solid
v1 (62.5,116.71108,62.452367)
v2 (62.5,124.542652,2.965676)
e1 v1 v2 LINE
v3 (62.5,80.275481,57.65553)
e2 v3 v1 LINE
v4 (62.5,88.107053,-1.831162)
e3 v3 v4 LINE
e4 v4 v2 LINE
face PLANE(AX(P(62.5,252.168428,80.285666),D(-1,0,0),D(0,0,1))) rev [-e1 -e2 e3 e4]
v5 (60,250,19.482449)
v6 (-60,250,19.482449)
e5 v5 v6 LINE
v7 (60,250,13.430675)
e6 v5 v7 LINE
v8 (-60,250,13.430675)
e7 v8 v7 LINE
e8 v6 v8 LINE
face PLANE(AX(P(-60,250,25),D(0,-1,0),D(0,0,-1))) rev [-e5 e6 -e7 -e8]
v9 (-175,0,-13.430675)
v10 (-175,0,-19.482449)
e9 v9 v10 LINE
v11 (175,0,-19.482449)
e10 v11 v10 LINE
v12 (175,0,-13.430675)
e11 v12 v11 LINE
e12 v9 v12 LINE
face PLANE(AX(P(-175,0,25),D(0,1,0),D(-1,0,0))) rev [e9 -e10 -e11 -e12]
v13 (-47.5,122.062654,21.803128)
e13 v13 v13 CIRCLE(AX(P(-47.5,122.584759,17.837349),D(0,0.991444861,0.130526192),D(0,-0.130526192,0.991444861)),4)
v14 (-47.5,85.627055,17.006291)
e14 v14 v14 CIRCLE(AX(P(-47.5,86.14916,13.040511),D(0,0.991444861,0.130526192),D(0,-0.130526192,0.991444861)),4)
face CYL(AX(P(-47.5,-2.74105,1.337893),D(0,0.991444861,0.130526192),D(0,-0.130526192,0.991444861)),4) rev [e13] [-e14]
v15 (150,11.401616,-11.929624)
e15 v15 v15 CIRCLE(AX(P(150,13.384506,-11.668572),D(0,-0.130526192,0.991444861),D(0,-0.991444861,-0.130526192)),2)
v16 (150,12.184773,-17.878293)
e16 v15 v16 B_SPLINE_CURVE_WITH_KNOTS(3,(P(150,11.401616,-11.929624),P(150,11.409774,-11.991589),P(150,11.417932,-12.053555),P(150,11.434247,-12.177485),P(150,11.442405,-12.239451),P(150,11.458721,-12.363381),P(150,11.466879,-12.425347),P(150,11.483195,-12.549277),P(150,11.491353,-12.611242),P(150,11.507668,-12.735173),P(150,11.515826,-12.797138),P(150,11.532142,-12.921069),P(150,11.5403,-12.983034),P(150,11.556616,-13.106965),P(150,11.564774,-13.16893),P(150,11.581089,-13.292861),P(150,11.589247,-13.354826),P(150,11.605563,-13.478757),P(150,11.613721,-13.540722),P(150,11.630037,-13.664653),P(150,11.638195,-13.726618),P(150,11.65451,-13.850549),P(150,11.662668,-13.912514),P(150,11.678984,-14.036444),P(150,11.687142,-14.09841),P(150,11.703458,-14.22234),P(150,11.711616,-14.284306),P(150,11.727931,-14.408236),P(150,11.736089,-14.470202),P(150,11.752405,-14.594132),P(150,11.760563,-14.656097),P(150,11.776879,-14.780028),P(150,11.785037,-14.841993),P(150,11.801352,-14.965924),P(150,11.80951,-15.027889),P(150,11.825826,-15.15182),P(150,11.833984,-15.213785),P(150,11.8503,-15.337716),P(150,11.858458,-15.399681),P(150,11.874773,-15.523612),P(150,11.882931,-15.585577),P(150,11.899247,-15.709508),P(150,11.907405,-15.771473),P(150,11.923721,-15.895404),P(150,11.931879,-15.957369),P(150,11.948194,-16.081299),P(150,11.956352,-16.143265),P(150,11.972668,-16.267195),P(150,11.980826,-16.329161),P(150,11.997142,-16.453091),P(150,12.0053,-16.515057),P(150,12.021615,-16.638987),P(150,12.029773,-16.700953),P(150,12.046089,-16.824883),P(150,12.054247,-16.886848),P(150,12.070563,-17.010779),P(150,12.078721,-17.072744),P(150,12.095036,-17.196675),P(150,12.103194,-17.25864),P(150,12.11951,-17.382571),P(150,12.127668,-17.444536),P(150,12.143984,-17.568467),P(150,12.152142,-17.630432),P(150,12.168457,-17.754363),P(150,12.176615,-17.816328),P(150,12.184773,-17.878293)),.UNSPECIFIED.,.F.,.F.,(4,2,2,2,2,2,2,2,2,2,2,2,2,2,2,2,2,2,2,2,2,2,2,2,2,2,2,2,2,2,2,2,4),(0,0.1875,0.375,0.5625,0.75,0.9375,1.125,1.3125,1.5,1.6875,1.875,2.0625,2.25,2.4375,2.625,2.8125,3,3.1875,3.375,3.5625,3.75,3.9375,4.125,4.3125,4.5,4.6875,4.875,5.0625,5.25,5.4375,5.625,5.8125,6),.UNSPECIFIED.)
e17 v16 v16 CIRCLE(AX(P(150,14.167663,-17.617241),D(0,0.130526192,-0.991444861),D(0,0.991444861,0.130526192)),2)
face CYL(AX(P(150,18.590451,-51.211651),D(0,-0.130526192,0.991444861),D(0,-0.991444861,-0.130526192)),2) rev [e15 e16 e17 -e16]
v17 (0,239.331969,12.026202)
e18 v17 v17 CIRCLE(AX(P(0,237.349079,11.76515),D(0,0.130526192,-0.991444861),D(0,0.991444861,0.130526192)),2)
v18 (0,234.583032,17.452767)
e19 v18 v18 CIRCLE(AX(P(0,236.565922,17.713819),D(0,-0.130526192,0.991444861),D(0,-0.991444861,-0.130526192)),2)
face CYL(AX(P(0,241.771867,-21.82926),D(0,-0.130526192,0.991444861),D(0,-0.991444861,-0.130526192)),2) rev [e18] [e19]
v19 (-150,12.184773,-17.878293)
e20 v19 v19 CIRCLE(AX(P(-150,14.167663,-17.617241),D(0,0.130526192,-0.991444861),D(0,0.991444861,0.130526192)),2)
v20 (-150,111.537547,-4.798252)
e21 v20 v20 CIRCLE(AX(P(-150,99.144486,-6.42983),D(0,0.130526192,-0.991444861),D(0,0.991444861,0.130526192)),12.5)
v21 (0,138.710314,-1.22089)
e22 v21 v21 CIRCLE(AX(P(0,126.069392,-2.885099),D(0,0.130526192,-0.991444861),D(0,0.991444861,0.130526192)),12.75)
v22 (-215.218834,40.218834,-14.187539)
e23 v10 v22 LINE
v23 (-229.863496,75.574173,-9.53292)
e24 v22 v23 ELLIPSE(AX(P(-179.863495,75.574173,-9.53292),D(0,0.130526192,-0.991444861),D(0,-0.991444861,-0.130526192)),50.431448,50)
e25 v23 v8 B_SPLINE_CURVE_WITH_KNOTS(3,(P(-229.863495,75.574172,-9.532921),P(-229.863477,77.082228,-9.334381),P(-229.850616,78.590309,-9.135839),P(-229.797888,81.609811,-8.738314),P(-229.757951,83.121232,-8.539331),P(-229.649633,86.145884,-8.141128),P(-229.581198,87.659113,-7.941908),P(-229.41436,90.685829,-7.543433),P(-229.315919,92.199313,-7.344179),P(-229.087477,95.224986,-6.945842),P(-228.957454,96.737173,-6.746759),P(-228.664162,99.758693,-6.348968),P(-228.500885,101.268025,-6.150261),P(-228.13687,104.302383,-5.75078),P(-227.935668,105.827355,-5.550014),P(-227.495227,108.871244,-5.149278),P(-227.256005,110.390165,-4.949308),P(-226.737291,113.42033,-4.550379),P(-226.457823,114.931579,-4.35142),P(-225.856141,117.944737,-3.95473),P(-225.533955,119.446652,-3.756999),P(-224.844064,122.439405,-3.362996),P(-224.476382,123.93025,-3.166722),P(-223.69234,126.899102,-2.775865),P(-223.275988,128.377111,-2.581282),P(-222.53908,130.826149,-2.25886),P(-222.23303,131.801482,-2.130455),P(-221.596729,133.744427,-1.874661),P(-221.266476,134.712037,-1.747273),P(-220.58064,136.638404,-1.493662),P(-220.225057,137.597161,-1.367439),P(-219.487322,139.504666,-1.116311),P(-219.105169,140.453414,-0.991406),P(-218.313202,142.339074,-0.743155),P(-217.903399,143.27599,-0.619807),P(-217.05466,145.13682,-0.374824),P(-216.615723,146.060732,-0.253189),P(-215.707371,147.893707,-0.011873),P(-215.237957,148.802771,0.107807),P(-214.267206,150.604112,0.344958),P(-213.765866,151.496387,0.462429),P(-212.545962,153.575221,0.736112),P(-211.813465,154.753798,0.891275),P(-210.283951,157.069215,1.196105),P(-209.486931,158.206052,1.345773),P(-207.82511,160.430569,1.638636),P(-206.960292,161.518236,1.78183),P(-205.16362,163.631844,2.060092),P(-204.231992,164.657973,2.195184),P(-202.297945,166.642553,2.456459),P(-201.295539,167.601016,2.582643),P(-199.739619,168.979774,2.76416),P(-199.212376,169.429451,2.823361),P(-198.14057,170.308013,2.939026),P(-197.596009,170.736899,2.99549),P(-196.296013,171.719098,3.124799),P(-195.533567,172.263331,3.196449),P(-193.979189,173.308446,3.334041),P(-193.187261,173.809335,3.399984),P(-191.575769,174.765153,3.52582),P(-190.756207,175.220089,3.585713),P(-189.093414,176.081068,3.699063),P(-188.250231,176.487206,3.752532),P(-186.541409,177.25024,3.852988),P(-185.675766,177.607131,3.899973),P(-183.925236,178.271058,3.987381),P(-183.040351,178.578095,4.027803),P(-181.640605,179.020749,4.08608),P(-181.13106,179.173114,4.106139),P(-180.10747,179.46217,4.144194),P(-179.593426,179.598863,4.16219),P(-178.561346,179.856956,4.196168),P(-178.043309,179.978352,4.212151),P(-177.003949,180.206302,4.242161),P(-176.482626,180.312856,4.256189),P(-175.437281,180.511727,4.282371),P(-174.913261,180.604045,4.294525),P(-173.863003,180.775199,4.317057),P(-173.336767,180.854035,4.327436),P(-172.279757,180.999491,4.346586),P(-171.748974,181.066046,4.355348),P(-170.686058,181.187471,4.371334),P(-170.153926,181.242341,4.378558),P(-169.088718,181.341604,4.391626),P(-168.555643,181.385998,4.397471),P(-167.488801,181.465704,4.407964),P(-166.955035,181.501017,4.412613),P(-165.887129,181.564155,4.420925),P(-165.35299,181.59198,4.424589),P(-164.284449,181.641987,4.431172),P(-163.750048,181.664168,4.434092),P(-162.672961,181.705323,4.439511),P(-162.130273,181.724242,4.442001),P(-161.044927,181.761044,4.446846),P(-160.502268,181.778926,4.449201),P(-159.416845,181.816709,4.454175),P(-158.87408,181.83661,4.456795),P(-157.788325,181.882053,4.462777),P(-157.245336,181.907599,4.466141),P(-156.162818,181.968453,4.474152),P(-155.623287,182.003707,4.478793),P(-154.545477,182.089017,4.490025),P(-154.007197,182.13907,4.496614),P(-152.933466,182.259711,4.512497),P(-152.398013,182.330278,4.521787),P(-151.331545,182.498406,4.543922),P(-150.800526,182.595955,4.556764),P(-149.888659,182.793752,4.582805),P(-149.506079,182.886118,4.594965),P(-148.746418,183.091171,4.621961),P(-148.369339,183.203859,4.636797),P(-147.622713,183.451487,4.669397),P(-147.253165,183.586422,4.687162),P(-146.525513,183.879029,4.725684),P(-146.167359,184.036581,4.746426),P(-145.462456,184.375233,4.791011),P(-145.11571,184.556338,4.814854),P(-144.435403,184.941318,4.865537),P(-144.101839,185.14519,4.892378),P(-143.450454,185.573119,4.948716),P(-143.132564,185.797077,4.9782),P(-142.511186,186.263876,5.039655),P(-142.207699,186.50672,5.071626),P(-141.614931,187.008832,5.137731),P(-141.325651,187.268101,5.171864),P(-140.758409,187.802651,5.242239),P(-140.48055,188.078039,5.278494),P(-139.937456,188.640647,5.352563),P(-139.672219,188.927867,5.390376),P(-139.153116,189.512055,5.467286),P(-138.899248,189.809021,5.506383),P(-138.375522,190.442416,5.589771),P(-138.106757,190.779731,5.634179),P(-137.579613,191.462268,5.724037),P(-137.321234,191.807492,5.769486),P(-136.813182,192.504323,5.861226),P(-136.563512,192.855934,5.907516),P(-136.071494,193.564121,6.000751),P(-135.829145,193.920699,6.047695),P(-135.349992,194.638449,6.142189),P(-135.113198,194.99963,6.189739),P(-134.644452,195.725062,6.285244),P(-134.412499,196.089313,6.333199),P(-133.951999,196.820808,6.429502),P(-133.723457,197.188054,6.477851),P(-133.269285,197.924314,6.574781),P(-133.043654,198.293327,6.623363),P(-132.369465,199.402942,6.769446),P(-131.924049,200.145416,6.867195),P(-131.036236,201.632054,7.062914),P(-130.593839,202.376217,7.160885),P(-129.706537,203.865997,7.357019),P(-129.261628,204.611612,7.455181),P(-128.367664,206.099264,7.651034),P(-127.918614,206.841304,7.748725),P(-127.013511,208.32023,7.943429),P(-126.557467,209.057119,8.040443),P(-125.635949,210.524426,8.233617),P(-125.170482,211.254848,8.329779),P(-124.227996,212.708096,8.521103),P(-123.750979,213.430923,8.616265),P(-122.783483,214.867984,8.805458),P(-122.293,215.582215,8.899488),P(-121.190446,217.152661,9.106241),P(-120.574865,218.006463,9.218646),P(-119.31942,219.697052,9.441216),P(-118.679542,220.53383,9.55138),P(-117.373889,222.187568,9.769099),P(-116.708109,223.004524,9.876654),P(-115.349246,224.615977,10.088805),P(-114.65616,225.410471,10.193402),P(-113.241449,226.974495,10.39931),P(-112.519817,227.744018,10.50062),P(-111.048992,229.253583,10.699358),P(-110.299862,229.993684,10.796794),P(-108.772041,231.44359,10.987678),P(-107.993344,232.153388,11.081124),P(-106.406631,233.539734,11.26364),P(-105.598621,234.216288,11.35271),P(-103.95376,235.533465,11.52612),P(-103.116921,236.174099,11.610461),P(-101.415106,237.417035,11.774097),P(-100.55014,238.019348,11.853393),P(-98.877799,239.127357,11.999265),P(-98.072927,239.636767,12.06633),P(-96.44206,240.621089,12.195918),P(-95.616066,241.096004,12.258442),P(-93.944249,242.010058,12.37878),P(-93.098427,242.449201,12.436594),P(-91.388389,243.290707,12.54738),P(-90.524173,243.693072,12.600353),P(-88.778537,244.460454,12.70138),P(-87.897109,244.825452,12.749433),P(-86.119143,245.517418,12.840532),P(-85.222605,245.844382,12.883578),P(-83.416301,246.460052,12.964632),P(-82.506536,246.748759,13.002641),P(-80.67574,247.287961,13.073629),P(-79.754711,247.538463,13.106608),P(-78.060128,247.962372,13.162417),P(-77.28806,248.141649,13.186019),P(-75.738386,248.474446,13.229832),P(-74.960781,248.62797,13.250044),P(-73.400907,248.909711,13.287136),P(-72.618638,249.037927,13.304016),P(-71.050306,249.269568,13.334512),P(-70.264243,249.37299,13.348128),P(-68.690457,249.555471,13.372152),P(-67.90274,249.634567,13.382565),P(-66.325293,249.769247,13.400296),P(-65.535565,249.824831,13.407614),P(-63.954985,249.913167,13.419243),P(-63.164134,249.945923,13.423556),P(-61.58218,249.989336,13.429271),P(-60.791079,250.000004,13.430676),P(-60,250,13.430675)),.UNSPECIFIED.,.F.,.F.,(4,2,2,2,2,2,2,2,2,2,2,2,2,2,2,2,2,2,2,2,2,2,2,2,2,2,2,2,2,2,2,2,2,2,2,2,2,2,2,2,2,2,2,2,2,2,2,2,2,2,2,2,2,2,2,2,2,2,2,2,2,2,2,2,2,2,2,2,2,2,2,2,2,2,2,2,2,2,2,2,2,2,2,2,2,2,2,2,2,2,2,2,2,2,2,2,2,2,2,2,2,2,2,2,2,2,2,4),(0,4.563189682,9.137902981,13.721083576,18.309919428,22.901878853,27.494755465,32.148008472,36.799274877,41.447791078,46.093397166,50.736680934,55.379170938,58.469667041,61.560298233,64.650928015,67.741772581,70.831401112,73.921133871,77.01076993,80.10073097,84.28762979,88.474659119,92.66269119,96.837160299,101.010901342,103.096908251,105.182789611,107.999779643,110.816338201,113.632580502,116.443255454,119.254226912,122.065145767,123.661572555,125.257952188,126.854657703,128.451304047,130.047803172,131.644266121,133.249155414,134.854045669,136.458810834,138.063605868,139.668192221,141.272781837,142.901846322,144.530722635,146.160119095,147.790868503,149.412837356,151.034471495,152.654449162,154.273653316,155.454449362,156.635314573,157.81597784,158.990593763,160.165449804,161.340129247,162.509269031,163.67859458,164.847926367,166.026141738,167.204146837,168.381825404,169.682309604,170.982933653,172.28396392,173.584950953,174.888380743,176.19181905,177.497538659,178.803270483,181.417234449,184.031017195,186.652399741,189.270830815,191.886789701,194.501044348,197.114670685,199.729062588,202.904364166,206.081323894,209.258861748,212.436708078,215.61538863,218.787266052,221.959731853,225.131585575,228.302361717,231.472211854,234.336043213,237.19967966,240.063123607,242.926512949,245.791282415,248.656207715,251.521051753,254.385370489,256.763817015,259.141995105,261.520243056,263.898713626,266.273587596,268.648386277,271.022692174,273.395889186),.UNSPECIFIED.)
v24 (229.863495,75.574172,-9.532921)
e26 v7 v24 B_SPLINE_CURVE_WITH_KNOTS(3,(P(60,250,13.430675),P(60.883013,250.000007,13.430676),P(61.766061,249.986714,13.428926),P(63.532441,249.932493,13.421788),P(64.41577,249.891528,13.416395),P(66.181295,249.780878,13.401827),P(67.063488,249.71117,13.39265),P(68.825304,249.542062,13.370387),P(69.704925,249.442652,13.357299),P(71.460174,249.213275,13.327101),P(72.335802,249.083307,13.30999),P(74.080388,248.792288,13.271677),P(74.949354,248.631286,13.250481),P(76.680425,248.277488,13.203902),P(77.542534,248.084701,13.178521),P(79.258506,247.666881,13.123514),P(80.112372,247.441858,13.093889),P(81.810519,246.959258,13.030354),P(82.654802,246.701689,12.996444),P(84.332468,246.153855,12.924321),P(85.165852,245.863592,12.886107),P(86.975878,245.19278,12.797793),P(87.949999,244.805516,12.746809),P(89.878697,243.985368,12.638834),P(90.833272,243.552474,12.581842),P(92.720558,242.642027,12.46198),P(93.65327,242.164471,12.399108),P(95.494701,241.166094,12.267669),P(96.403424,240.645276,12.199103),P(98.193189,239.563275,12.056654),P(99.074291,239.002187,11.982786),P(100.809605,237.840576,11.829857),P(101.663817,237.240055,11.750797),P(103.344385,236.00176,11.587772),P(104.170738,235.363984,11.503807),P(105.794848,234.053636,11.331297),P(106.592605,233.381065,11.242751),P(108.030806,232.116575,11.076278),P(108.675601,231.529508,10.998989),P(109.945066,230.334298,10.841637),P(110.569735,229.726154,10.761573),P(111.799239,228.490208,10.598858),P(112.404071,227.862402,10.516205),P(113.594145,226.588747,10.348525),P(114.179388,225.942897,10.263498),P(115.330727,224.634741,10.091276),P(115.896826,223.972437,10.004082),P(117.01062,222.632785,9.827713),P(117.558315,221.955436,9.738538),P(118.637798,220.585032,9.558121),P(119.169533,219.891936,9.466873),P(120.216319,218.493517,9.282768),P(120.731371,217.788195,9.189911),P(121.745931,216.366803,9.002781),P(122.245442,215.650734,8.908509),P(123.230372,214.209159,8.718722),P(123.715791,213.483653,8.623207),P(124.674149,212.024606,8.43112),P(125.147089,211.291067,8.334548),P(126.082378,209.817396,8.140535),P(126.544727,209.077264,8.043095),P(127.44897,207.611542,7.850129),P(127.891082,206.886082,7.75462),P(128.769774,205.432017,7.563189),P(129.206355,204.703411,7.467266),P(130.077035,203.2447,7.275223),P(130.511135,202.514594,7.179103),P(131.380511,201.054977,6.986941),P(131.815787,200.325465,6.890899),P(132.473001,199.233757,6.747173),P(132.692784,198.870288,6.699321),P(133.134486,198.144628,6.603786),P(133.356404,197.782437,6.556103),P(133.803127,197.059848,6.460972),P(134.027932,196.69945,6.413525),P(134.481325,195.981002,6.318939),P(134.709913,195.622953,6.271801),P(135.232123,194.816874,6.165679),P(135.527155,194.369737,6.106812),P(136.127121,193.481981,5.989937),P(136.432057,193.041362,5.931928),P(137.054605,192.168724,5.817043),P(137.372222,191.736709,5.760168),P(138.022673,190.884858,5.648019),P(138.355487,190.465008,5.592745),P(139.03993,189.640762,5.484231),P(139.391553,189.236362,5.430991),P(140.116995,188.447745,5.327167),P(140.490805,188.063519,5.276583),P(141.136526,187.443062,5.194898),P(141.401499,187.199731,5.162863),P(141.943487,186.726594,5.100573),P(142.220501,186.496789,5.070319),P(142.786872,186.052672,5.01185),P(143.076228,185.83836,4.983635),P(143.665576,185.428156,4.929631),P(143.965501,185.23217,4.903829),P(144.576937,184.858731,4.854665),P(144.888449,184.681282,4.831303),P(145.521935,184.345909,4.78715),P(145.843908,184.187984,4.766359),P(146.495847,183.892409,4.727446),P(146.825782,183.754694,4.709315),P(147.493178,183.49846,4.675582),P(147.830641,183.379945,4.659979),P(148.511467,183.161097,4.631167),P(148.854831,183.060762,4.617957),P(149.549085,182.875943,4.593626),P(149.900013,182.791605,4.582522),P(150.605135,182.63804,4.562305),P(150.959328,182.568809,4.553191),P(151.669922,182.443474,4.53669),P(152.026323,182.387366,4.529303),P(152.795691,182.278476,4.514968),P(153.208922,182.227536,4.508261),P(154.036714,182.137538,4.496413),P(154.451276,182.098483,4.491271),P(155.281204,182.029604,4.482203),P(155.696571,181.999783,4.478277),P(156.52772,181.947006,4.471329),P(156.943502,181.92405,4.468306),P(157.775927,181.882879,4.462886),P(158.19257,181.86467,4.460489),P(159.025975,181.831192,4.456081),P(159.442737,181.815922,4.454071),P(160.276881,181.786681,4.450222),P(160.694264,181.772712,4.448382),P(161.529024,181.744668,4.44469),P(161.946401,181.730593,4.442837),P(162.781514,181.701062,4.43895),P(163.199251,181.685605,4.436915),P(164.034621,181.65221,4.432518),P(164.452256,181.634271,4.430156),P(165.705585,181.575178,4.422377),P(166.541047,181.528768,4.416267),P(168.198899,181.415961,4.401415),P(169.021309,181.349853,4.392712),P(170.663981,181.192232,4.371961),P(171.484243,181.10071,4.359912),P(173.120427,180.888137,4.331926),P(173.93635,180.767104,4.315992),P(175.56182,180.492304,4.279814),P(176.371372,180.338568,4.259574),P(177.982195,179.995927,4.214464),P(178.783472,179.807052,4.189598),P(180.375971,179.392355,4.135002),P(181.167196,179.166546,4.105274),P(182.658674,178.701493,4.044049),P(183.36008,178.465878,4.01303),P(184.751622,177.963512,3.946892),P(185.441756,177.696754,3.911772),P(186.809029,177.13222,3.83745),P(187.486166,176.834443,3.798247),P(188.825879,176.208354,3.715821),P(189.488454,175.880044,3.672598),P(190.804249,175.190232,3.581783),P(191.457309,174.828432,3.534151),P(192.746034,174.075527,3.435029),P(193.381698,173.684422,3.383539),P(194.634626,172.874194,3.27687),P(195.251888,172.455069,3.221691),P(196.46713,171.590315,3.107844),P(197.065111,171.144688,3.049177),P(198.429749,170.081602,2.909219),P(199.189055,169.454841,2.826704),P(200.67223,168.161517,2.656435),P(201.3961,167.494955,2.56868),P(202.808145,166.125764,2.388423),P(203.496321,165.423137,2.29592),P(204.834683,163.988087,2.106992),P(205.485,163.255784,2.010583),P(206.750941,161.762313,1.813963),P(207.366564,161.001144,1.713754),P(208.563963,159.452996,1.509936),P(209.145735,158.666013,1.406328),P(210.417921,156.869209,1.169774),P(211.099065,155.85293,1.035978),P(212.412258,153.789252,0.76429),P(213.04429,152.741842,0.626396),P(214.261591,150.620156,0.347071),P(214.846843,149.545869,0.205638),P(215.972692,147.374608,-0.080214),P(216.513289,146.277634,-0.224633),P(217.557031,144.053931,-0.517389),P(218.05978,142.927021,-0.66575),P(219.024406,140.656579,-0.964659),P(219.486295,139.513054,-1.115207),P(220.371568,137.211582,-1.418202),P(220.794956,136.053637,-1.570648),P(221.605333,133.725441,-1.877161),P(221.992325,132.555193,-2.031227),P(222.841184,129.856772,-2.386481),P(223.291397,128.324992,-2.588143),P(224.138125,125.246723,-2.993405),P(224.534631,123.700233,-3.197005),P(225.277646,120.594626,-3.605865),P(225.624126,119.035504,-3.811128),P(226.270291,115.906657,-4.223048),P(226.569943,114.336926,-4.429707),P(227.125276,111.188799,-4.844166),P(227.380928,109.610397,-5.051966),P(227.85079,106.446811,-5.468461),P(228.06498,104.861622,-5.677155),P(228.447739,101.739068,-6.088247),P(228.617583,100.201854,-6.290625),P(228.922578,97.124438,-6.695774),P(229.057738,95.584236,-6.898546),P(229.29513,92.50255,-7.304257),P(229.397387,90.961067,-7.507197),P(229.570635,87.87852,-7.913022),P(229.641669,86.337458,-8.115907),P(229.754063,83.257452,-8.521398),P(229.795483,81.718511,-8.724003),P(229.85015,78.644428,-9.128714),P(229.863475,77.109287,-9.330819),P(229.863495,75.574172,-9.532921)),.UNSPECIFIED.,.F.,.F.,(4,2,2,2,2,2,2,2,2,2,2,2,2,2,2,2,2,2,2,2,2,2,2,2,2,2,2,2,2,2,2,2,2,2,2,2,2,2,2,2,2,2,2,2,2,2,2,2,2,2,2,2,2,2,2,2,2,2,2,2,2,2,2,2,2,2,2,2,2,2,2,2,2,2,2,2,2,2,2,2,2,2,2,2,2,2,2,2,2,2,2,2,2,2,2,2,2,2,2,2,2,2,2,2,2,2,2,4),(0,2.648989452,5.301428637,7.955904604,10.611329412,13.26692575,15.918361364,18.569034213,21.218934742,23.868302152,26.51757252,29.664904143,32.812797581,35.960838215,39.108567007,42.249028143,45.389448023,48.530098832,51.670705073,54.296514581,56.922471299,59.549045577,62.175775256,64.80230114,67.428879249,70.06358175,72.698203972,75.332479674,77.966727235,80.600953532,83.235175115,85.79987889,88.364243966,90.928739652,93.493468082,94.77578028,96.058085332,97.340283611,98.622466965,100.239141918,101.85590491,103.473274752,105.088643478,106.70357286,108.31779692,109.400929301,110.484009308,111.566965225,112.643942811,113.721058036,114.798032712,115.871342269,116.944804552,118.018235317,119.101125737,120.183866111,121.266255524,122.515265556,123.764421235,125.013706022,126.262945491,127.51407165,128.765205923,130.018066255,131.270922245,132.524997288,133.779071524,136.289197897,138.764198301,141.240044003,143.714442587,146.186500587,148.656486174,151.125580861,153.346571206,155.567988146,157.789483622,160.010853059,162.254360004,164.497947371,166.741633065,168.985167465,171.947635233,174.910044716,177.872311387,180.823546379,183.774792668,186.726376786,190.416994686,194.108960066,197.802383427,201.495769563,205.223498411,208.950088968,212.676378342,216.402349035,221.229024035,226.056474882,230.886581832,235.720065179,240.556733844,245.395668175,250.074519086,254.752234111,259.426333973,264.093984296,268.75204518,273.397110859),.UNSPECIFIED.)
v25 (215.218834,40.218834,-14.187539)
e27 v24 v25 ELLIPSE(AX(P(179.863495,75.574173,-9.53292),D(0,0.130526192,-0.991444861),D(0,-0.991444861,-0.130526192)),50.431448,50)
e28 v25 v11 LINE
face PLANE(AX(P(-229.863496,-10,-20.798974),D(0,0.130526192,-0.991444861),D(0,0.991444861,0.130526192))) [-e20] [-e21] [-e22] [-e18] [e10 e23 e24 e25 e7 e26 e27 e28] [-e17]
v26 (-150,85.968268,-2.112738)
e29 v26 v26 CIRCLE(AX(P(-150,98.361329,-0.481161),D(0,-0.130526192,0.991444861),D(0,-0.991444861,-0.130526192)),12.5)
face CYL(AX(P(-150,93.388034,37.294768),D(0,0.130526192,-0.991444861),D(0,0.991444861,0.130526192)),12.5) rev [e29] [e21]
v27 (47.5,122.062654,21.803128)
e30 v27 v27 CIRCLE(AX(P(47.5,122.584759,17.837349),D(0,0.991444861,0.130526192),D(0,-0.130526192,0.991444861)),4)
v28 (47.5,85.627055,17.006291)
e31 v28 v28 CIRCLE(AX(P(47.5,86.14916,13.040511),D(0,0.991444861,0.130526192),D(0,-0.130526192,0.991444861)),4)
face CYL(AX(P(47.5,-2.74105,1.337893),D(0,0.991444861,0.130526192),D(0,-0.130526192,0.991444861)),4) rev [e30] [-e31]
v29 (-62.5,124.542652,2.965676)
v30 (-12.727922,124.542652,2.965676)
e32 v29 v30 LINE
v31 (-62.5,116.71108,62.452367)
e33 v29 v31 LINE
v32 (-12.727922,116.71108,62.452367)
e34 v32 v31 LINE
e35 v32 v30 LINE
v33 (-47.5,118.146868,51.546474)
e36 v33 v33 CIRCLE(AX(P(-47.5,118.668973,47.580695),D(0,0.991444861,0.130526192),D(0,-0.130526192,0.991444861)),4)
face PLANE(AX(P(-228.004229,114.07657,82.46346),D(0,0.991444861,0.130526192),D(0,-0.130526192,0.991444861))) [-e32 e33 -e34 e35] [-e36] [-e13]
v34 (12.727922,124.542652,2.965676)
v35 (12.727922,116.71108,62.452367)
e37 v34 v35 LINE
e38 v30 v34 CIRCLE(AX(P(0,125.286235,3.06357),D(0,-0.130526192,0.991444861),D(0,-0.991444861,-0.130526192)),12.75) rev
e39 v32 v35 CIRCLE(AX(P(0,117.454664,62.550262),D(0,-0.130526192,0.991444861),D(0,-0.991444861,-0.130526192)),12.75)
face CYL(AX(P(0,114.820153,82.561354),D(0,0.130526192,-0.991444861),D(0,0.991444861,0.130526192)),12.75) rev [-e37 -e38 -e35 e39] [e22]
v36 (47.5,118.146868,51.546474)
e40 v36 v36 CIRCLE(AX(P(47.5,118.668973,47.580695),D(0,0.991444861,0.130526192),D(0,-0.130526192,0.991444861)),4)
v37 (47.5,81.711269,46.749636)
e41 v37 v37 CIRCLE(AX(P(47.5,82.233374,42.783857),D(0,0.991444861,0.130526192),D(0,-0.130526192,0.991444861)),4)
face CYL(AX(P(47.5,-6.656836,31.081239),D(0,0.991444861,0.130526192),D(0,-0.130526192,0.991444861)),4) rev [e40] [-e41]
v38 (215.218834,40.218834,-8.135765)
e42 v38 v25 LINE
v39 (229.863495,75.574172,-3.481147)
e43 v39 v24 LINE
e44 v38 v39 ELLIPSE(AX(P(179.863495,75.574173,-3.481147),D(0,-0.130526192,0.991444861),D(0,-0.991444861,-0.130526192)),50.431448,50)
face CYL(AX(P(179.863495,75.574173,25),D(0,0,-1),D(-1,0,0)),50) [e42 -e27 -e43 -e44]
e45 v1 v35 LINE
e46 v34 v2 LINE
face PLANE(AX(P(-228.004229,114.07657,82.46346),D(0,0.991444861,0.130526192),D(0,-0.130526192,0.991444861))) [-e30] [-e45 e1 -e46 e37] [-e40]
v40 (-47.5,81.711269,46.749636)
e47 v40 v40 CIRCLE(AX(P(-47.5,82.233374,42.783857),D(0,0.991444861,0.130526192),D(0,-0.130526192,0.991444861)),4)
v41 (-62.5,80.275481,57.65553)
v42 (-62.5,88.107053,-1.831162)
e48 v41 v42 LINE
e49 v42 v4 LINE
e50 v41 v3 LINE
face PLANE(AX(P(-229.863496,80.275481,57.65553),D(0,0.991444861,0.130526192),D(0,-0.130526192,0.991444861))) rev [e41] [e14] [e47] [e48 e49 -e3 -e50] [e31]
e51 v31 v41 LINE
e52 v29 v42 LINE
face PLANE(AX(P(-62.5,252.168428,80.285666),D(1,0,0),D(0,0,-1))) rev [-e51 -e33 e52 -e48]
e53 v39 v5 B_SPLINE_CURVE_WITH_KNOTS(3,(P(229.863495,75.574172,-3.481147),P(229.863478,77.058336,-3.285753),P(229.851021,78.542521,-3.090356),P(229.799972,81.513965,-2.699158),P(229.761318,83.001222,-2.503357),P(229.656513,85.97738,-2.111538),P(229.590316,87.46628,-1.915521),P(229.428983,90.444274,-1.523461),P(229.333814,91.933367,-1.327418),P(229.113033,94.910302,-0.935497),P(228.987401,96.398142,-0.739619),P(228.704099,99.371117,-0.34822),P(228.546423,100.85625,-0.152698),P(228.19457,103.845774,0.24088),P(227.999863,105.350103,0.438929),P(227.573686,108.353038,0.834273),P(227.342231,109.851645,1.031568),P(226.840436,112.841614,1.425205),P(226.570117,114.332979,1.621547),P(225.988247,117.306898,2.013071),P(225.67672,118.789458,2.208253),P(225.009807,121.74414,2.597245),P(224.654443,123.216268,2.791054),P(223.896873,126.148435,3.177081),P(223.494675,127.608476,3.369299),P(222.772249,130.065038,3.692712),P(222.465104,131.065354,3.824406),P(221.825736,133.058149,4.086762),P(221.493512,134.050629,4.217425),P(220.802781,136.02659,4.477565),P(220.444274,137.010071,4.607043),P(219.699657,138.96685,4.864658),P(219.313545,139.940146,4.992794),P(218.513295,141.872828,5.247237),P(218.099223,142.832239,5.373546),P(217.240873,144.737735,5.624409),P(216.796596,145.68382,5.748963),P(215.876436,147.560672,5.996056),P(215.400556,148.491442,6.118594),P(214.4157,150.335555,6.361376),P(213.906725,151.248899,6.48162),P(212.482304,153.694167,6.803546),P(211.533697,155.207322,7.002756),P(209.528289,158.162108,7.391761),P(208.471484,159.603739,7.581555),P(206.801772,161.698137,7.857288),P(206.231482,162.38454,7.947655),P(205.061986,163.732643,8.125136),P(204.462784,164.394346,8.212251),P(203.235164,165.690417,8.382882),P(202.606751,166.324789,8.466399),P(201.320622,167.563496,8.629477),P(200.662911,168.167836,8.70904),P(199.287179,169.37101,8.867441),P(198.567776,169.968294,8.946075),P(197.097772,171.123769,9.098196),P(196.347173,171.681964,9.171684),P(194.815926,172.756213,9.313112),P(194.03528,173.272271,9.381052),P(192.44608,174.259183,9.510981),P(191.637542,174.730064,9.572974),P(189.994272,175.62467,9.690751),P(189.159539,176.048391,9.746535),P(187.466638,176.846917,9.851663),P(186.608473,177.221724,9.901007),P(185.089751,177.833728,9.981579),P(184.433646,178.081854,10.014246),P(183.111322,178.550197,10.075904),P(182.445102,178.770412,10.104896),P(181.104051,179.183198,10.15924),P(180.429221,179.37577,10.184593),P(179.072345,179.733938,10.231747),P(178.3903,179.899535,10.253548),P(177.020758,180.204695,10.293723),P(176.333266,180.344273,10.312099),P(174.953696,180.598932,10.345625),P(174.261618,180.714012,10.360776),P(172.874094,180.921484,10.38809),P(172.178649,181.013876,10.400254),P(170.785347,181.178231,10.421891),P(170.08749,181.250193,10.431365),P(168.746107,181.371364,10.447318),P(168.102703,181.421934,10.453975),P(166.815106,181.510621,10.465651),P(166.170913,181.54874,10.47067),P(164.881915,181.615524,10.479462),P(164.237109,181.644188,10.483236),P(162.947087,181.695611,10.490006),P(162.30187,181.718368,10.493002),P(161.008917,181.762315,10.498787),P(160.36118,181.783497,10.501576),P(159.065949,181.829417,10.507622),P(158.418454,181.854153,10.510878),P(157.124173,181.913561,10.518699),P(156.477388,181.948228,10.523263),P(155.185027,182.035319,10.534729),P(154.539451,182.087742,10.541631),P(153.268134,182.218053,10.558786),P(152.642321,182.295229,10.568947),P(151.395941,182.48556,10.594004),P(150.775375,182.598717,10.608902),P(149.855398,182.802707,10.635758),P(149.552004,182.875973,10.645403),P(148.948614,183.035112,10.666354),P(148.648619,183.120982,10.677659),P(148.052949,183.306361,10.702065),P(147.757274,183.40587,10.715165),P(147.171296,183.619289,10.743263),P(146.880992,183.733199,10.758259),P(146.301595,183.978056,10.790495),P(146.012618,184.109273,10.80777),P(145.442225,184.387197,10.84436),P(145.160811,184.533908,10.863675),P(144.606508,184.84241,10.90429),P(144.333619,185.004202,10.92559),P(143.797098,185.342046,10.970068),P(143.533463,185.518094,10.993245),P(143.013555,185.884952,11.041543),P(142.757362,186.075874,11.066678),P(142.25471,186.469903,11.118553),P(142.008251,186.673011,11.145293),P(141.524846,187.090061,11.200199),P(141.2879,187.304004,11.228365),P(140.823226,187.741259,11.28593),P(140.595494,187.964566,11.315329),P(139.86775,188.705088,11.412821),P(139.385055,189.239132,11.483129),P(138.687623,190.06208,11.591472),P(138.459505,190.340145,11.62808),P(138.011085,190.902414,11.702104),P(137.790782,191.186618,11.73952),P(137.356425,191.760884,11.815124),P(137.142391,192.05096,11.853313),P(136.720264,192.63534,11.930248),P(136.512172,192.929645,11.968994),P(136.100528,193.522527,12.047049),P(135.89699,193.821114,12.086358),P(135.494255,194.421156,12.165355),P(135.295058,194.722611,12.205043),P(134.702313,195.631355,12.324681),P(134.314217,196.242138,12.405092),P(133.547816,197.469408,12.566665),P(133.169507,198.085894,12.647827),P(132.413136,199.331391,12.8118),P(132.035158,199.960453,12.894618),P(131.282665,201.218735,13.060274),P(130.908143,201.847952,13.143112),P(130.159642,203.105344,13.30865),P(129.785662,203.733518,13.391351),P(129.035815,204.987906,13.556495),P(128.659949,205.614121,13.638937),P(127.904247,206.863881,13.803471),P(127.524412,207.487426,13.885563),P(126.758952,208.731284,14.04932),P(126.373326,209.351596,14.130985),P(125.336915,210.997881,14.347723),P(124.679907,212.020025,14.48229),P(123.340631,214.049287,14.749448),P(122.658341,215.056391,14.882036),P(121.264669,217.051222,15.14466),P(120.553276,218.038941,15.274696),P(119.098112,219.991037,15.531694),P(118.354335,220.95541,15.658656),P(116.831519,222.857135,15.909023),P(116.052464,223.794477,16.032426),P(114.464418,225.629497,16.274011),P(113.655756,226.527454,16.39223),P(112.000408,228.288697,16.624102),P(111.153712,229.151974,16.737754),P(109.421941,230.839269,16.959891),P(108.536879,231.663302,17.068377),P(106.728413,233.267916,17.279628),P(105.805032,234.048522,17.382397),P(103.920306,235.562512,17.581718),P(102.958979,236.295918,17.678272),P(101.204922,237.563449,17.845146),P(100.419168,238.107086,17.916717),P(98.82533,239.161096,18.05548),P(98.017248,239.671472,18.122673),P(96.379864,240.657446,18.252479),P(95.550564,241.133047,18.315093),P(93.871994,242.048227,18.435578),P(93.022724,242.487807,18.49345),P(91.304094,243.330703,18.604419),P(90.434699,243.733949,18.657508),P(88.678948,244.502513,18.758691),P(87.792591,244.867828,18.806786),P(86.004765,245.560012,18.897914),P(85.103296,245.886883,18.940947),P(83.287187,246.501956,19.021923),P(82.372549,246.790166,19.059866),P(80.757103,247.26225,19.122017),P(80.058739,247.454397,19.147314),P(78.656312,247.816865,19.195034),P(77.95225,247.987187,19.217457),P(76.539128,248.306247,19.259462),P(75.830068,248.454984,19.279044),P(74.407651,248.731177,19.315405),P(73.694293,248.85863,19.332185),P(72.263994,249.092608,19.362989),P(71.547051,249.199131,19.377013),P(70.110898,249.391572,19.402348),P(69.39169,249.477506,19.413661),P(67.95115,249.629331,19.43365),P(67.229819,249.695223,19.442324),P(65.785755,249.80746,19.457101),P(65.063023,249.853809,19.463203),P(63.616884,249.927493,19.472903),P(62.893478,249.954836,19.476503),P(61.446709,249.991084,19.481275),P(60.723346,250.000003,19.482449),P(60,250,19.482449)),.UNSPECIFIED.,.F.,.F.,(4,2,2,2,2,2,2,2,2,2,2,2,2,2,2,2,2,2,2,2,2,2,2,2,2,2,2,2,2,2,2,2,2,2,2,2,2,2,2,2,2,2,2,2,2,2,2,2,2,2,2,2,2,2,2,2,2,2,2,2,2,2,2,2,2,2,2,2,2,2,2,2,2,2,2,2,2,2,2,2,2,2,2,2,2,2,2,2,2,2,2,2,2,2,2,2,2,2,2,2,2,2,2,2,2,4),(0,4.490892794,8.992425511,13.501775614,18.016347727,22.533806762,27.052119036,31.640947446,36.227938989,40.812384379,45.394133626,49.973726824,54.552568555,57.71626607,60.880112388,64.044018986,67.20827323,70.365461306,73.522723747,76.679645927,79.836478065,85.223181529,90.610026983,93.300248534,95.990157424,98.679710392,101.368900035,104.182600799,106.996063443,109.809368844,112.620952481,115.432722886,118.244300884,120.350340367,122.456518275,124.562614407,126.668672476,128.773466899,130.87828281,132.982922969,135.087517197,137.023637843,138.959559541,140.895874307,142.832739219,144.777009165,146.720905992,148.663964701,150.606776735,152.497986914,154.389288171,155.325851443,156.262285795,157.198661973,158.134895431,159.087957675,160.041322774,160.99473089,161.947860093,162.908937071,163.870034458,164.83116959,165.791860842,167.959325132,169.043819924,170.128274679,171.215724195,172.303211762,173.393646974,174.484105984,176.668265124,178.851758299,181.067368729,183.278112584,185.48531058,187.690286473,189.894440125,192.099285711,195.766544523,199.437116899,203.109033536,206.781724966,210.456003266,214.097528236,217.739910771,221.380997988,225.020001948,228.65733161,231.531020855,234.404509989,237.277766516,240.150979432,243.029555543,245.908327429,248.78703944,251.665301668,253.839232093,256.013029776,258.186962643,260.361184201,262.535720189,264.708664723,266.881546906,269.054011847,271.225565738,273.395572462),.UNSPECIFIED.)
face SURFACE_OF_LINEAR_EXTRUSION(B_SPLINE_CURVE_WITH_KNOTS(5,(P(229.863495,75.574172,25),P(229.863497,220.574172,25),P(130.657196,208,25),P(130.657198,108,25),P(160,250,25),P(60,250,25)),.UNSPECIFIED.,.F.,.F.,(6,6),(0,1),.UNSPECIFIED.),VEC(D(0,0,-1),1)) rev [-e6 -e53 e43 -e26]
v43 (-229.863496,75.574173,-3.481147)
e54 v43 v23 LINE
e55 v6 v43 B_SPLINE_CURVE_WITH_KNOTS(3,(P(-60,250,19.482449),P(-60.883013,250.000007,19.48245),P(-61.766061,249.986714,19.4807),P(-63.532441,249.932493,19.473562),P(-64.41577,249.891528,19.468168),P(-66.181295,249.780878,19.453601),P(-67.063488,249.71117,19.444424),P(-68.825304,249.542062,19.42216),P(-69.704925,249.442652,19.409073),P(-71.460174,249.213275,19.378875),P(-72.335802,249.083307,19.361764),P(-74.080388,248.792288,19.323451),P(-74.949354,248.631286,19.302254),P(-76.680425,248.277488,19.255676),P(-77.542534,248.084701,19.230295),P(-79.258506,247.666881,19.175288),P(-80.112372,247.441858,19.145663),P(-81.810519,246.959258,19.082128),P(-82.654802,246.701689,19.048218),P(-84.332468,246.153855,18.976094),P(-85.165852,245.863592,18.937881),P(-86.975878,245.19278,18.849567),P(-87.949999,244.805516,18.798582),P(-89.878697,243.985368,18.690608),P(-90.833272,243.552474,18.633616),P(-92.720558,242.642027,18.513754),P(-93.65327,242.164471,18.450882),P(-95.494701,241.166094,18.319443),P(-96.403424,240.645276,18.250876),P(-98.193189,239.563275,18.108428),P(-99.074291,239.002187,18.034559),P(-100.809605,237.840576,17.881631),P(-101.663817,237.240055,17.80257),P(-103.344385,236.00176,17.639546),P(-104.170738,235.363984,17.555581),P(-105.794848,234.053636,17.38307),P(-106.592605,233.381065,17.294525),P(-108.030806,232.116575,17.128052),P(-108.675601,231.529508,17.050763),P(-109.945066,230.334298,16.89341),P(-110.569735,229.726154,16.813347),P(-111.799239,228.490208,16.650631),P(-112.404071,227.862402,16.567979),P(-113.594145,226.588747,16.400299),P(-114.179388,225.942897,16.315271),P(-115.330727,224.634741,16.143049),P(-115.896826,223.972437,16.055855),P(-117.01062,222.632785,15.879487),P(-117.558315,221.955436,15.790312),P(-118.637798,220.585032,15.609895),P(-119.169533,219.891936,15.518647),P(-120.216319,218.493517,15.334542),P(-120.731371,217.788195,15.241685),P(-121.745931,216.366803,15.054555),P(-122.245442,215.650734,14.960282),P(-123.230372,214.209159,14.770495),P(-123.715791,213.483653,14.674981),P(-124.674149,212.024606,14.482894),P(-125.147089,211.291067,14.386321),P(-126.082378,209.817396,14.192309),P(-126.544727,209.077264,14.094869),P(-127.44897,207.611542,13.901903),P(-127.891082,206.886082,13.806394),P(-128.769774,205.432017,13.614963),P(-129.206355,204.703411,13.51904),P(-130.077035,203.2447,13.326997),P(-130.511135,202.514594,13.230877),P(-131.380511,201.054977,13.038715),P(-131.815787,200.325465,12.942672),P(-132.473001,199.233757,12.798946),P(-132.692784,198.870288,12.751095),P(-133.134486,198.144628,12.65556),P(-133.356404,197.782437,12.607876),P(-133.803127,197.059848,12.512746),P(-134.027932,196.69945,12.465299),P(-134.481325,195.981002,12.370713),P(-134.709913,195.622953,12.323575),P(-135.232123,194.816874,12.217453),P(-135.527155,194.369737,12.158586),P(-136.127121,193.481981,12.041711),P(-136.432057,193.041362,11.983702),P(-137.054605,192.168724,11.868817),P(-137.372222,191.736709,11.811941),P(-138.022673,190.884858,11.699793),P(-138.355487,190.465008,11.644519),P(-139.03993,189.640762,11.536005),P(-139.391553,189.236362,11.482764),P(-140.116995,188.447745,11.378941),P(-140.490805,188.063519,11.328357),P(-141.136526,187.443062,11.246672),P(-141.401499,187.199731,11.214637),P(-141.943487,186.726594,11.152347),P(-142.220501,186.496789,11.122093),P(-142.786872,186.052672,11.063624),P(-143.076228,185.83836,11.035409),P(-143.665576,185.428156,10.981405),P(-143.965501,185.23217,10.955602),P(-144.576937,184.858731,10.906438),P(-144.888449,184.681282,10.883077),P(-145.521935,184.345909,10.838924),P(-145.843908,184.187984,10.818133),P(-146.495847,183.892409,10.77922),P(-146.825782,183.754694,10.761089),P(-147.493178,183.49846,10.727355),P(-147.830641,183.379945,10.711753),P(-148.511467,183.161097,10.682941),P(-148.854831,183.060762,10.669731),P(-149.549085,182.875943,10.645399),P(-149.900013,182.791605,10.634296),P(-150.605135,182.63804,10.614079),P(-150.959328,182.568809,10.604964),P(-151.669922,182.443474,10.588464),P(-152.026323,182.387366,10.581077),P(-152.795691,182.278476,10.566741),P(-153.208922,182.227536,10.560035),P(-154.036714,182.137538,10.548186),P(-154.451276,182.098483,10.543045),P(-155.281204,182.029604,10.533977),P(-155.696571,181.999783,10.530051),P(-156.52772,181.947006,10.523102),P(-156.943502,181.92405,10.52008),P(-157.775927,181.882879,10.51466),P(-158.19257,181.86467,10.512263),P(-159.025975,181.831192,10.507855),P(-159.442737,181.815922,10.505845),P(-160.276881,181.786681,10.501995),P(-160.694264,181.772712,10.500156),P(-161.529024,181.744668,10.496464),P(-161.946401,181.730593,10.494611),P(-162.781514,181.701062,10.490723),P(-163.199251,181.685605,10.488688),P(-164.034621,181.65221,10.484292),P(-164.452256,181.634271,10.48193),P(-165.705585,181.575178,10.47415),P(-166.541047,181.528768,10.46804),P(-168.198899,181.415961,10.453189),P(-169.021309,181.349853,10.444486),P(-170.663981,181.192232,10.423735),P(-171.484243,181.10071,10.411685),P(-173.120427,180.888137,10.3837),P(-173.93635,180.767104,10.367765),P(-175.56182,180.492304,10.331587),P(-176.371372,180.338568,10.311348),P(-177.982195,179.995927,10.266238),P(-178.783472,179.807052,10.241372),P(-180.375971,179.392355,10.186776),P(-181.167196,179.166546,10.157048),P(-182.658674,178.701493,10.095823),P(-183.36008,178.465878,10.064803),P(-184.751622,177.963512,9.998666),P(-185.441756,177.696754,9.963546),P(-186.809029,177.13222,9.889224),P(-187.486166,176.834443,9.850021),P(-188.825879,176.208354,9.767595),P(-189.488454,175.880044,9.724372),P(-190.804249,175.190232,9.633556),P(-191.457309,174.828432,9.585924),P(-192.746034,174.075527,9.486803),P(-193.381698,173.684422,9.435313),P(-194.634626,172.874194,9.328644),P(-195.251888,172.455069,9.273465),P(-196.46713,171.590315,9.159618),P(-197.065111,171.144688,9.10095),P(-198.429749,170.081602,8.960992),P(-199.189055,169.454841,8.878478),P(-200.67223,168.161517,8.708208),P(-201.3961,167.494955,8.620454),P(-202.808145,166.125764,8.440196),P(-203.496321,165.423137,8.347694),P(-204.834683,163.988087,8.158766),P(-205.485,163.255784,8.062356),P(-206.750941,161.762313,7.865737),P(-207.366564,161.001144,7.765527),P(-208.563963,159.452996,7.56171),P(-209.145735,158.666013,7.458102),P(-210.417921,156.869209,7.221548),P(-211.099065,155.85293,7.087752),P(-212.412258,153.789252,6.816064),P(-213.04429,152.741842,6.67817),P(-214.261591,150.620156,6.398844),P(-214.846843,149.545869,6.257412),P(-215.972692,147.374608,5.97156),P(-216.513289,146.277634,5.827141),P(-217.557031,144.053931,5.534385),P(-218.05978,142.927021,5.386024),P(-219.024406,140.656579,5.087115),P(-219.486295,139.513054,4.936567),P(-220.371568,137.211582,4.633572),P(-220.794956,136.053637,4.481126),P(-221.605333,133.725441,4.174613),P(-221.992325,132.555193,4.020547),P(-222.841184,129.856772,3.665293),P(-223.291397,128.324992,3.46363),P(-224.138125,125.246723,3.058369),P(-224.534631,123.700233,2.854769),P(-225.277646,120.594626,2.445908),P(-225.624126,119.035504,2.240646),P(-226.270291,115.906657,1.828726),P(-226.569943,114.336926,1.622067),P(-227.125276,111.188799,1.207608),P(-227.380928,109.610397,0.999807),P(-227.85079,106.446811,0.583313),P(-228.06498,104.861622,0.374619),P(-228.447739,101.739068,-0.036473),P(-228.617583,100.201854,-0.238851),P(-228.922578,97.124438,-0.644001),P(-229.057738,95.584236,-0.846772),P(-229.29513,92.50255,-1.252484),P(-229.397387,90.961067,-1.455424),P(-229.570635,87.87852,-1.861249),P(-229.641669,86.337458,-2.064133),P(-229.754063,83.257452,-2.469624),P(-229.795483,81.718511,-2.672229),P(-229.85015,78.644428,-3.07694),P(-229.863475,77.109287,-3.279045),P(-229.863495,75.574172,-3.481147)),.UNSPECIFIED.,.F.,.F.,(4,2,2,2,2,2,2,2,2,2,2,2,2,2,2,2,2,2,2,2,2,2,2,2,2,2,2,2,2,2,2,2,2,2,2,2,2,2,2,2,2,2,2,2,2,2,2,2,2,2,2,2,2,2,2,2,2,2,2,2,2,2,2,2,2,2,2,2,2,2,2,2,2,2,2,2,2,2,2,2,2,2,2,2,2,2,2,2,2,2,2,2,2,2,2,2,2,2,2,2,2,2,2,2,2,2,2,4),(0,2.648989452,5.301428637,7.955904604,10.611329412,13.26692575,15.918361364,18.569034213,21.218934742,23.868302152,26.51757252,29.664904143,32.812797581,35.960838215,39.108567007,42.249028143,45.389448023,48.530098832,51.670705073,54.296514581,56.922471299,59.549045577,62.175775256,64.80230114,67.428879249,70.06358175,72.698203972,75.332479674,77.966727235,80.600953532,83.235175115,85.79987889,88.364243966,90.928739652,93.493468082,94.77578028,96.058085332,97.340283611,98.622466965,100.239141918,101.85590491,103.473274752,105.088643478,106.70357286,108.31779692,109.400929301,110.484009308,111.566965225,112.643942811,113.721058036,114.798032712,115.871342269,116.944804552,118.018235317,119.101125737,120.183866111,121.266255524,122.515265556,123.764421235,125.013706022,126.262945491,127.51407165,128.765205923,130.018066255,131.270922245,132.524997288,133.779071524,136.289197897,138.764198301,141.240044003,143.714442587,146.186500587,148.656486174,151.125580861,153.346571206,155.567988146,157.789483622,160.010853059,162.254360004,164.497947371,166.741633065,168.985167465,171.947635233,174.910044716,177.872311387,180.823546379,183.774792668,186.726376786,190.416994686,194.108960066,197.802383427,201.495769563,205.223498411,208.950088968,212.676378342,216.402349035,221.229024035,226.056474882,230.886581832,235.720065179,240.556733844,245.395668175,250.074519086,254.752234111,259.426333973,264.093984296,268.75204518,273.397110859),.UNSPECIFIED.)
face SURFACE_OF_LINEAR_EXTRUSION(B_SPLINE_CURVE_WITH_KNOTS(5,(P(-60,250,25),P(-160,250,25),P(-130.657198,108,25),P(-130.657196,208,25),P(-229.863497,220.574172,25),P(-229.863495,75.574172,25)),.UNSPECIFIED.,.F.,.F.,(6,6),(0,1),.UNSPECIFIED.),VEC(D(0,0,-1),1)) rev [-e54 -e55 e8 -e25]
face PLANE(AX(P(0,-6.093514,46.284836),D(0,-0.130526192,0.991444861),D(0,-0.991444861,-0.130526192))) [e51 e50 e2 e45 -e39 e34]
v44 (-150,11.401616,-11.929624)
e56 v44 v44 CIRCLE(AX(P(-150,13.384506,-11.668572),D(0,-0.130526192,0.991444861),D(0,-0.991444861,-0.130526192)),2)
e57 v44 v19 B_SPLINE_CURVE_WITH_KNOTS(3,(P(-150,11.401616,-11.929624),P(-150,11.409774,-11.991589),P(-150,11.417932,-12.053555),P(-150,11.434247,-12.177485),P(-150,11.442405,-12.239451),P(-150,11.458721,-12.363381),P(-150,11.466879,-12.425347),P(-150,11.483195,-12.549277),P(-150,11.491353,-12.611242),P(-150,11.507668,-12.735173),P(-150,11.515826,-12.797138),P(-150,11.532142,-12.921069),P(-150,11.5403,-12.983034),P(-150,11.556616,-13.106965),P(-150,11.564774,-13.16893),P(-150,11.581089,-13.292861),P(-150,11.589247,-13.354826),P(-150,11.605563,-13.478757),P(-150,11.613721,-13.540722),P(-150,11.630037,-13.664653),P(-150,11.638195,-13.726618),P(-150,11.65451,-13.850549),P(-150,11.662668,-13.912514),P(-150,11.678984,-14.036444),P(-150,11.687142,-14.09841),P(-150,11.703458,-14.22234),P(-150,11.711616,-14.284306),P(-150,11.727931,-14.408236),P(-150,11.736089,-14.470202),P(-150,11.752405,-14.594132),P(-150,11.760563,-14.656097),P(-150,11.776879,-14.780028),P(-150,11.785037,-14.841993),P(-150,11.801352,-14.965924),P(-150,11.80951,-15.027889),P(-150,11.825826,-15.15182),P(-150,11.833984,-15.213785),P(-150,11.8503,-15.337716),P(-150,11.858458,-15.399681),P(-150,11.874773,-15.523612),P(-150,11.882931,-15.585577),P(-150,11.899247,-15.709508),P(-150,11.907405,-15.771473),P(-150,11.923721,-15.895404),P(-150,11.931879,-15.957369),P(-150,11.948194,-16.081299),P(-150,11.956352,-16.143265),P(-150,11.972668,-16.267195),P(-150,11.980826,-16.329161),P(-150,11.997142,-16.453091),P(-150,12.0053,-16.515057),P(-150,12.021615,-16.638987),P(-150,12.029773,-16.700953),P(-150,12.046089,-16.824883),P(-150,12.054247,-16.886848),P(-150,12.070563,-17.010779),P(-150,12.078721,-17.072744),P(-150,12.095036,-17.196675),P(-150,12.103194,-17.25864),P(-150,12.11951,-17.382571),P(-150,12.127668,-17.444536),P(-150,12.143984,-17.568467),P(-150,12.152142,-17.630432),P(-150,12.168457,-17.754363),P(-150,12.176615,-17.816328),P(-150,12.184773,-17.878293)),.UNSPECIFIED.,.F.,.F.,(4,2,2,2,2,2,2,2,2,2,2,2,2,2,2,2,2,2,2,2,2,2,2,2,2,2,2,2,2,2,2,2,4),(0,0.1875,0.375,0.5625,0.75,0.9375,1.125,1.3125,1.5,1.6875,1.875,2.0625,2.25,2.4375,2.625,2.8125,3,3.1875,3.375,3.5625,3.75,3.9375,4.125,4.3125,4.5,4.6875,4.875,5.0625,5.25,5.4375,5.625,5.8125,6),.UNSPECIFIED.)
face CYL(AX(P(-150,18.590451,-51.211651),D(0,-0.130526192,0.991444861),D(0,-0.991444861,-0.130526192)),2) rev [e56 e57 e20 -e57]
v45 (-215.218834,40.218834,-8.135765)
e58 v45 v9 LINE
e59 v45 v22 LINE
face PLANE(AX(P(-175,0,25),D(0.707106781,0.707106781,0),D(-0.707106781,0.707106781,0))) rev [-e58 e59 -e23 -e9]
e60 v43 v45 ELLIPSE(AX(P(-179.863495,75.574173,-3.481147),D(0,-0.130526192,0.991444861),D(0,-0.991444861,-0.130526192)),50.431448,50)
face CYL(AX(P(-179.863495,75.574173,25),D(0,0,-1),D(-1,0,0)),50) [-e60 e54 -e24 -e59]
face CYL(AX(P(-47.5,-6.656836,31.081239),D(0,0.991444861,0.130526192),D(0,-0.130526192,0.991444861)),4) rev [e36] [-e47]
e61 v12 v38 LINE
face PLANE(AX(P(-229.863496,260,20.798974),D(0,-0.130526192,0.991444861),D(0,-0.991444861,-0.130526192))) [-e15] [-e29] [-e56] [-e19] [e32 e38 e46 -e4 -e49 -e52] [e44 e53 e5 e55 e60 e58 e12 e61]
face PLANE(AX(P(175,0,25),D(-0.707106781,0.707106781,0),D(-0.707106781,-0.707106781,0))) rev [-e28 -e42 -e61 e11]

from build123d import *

# Parameters (mm, degrees)
EXTRUDE_START                                 = -25
EXTRUDE_PLATE_SHAPE_DEPTH                     = 50
CUT_EXTRUDE_ANGLE_DEPTH                       = 341.53226913
CUT_EXTRUDE_ANGLE_DEPTH_BACK                  = 341.53226913
CUT_EXTRUDE_SWITCH_HOLE_DEPTH                 = 340.963942654
CUT_EXTRUDE_SWITCH_HOLE_DEPTH_BACK            = 340.963942654
IGNITION_SWITCH_HOLE_R                        = 12.5
CUT_EXTRUDE_TOP_ENCLOSURE_HOLE_DEPTH          = 340.910991738
CUT_EXTRUDE_TOP_ENCLOSURE_HOLE_DEPTH_BACK     = 340.910991738
SKETCH23_R                                    = 2
CUT_EXTRUDE_BOTTOM_ENCLOSURE_HOLES_DEPTH      = 340.910991738
CUT_EXTRUDE_BOTTOM_ENCLOSURE_HOLES_DEPTH_BACK = 340.910991738
BOTTOM_ENCLOSURE_MOUNTING_HOLES_R             = 2
BOSS_EXTRUDE1_START                           = -6
SKETCH24_W                                    = 125
SKETCH24_H                                    = 75
BOSS_EXTRUDE1_DEPTH                           = 60
CUT_EXTRUDE_SHAFT_HOLE_DEPTH                  = 349.685760497
CUT_EXTRUDE_SHAFT_HOLE_DEPTH_BACK             = 349.685760497
STEERING_WHEEL_SHAFT_HOLE_R                   = 12.75
SKETCH26_W                                    = 456.008458956
SKETCH26_H                                    = 1.5
EXTRUDE_CUT_SLOT_DEPTH                        = 348.814796903
CUT_EXTRUDE17_DEPTH                           = 285.275916409
CUT_EXTRUDE17_DEPTH_BACK                      = 285.275916409
SKETCH28_R                                    = 4
CUT_EXTRUDE18_DEPTH                           = 351.351894744
CUT_EXTRUDE18_DEPTH_BACK                      = 60
SKETCH30_W                                    = 150
SKETCH30_H                                    = 50


# Read off the part's stored shape, not the designer's step: Extrude Plate Shape
with BuildPart() as part:
    # Extrude Plate Shape outline → Extrude Plate Shape (new body)
    with BuildSketch(Plane.XY.offset(EXTRUDE_START)):
        with BuildLine():
            Line((175, 0), (215.218833807, 40.218833807))
            ThreePointArc((215.218833807, 40.218833807), (226.057471223, 56.440000887), (229.863494748, 75.574172084))
            add(Edge.make_bspline(
                [(229.863494748, 75.574172084), (229.863497015, 220.574172084), (130.657195822, 208), (130.657198498, 108), (160, 250), (60, 250)],
                knots=[0, 0, 0, 0, 0, 0, 1, 1, 1, 1, 1, 1], degree=5))
            Line((60, 250), (-60, 250))
            add(Edge.make_bspline(
                [(-60, 250), (-160, 250), (-130.657198498, 108), (-130.657195822, 208), (-229.863497015, 220.574172084), (-229.863494748, 75.574172084)],
                knots=[0, 0, 0, 0, 0, 0, 1, 1, 1, 1, 1, 1], degree=5))
            ThreePointArc((-229.863494748, 75.574172084), (-226.057471223, 56.440000887), (-215.218833807, 40.218833807))
            Line((-215.218833807, 40.218833807), (-175, 0))
            Line((-175, 0), (175, 0))
        make_face()
    extrude(amount=EXTRUDE_PLATE_SHAPE_DEPTH)

    # 5-Degree Front Plate → Cut-Extrude Angle (cut, two sides: drawn at the far end of the back side and taken through both)
    with BuildSketch(Plane(origin=(0, 0, 0), x_dir=(0, 0, -1), z_dir=(1, 0, 0)).offset(-CUT_EXTRUDE_ANGLE_DEPTH_BACK)):
        Polygon((20.798974056, -10), (-14.747200293, 260), (35, 260), (35, -10), align=None)
        Polygon((-20.798974056, 260), (14.747200293, -10), (-35, -10), (-35, 260), align=None)
    extrude(amount=CUT_EXTRUDE_ANGLE_DEPTH + CUT_EXTRUDE_ANGLE_DEPTH_BACK, mode=Mode.SUBTRACT)

    # Ignition Switch Hole → Cut-Extrude Switch Hole (cut, two sides: drawn at the far end of the back side and taken through both)
    with BuildSketch(Plane(origin=(0, 2.521214434, -19.150524903), x_dir=(-1, 0, 0), z_dir=(0, 0.13052619222005532, -0.99144486137381)).offset(-CUT_EXTRUDE_SWITCH_HOLE_DEPTH_BACK)):
        with Locations(Location((150, 97.457030106, 0), (0, 0, 90))):
            Circle(IGNITION_SWITCH_HOLE_R)
    extrude(amount=CUT_EXTRUDE_SWITCH_HOLE_DEPTH + CUT_EXTRUDE_SWITCH_HOLE_DEPTH_BACK, mode=Mode.SUBTRACT)

    # Sketch23 → Cut-Extrude Top Enclosure Hole (cut, two sides: drawn at the far end of the back side and taken through both)
    with BuildSketch(Plane(origin=(0, 1.73805728, -13.201855735), x_dir=(1, 0, 0), z_dir=(0, -0.13052619222005535, 0.99144486137381)).offset(-CUT_EXTRUDE_TOP_ENCLOSURE_HOLE_DEPTH_BACK)):
        with Locations(Location((0, 236.854185237, 0), (0, 0, 270))):
            Circle(SKETCH23_R)
    extrude(amount=CUT_EXTRUDE_TOP_ENCLOSURE_HOLE_DEPTH + CUT_EXTRUDE_TOP_ENCLOSURE_HOLE_DEPTH_BACK, mode=Mode.SUBTRACT)

    # Bottom Enclosure Mounting Holes → Cut-Extrude Bottom Enclosure Holes (cut, two sides: drawn at the far end of the back side and taken through both)
    with BuildSketch(Plane(origin=(0, 1.73805728, -13.201855735), x_dir=(1, 0, 0), z_dir=(0, -0.13052619222005535, 0.99144486137381)).offset(-CUT_EXTRUDE_BOTTOM_ENCLOSURE_HOLES_DEPTH_BACK)):
        with Locations(Location((150, 11.746945092, 0), (0, 0, 270))):
            Circle(BOTTOM_ENCLOSURE_MOUNTING_HOLES_R)
        with Locations(Location((-150, 11.746945092, 0), (0, 0, 270))):
            Circle(BOTTOM_ENCLOSURE_MOUNTING_HOLES_R)
    extrude(amount=CUT_EXTRUDE_BOTTOM_ENCLOSURE_HOLES_DEPTH + CUT_EXTRUDE_BOTTOM_ENCLOSURE_HOLES_DEPTH_BACK, mode=Mode.SUBTRACT)

    # Sketch24 → Boss-Extrude1 (add)
    with BuildSketch(Plane(origin=(0, 2.521214434, -19.150524903), x_dir=(-1, 0, 0), z_dir=(0, 0.13052619222005538, -0.99144486137381)).offset(BOSS_EXTRUDE1_START)):
        with Locations((0, 124.614270251)):
            Rectangle(SKETCH24_W, SKETCH24_H)
    extrude(amount=-BOSS_EXTRUDE1_DEPTH)

    # Steering Wheel Shaft Hole → Cut-Extrude Shaft Hole (cut, two sides: drawn at the far end of the back side and taken through both)
    with BuildSketch(Plane(origin=(0, 2.521214434, -19.150524903), x_dir=(-1, 0, 0), z_dir=(0, 0.13052619222005532, -0.99144486137381)).offset(-CUT_EXTRUDE_SHAFT_HOLE_DEPTH_BACK)):
        with Locations(Location((0, 124.614270251, 0), (0, 0, 90))):
            Circle(STEERING_WHEEL_SHAFT_HOLE_R)
    extrude(amount=CUT_EXTRUDE_SHAFT_HOLE_DEPTH + CUT_EXTRUDE_SHAFT_HOLE_DEPTH_BACK, mode=Mode.SUBTRACT)

    # Sketch26 → Extrude-Cut Slot (cut, through all)
    with BuildSketch(Plane(origin=(0, 1.73805728, -13.201855735), x_dir=(1, 0, 0), z_dir=(0, -0.13052619222005535, 0.99144486137381))):
        with Locations((0, 124.614270251)):
            Rectangle(SKETCH26_W, SKETCH26_H)
    extrude(amount=EXTRUDE_CUT_SLOT_DEPTH, mode=Mode.SUBTRACT)

    # Sketch28 → Cut-Extrude17 (cut, two sides: drawn at the far end of the back side and taken through both)
    with BuildSketch(Plane(origin=(0, 160.727360196, 21.1601584), x_dir=(1, 0, 0), z_dir=(0, 0.99144486137381, 0.1305261922200554)).offset(-CUT_EXTRUDE17_DEPTH_BACK)):
        with Locations(Location((-47.5, -31.684225972, 0), (0, 0, 270))):
            Circle(SKETCH28_R)
        with Locations(Location((-47.5, -1.684225972, 0), (0, 0, 270))):
            Circle(SKETCH28_R)
        with Locations(Location((47.5, -31.684225972, 0), (0, 0, 90))):
            Circle(SKETCH28_R)
        with Locations(Location((47.5, -1.684225972, 0), (0, 0, 90))):
            Circle(SKETCH28_R)
    extrude(amount=CUT_EXTRUDE17_DEPTH + CUT_EXTRUDE17_DEPTH_BACK, mode=Mode.SUBTRACT)

    # Sketch30 → Cut-Extrude18 (cut, two sides: drawn at the far end of the back side and taken through both)
    with BuildSketch(Plane(origin=(0, -6.093514253, 46.284835948), x_dir=(1, 0, 0), z_dir=(0, -0.1305261922200554, 0.99144486137381)).offset(-CUT_EXTRUDE18_DEPTH_BACK)):
        with Locations((0, 149.614270251)):
            Rectangle(SKETCH30_W, SKETCH30_H)
    extrude(amount=CUT_EXTRUDE18_DEPTH + CUT_EXTRUDE18_DEPTH_BACK, mode=Mode.SUBTRACT)


solid = part.part
